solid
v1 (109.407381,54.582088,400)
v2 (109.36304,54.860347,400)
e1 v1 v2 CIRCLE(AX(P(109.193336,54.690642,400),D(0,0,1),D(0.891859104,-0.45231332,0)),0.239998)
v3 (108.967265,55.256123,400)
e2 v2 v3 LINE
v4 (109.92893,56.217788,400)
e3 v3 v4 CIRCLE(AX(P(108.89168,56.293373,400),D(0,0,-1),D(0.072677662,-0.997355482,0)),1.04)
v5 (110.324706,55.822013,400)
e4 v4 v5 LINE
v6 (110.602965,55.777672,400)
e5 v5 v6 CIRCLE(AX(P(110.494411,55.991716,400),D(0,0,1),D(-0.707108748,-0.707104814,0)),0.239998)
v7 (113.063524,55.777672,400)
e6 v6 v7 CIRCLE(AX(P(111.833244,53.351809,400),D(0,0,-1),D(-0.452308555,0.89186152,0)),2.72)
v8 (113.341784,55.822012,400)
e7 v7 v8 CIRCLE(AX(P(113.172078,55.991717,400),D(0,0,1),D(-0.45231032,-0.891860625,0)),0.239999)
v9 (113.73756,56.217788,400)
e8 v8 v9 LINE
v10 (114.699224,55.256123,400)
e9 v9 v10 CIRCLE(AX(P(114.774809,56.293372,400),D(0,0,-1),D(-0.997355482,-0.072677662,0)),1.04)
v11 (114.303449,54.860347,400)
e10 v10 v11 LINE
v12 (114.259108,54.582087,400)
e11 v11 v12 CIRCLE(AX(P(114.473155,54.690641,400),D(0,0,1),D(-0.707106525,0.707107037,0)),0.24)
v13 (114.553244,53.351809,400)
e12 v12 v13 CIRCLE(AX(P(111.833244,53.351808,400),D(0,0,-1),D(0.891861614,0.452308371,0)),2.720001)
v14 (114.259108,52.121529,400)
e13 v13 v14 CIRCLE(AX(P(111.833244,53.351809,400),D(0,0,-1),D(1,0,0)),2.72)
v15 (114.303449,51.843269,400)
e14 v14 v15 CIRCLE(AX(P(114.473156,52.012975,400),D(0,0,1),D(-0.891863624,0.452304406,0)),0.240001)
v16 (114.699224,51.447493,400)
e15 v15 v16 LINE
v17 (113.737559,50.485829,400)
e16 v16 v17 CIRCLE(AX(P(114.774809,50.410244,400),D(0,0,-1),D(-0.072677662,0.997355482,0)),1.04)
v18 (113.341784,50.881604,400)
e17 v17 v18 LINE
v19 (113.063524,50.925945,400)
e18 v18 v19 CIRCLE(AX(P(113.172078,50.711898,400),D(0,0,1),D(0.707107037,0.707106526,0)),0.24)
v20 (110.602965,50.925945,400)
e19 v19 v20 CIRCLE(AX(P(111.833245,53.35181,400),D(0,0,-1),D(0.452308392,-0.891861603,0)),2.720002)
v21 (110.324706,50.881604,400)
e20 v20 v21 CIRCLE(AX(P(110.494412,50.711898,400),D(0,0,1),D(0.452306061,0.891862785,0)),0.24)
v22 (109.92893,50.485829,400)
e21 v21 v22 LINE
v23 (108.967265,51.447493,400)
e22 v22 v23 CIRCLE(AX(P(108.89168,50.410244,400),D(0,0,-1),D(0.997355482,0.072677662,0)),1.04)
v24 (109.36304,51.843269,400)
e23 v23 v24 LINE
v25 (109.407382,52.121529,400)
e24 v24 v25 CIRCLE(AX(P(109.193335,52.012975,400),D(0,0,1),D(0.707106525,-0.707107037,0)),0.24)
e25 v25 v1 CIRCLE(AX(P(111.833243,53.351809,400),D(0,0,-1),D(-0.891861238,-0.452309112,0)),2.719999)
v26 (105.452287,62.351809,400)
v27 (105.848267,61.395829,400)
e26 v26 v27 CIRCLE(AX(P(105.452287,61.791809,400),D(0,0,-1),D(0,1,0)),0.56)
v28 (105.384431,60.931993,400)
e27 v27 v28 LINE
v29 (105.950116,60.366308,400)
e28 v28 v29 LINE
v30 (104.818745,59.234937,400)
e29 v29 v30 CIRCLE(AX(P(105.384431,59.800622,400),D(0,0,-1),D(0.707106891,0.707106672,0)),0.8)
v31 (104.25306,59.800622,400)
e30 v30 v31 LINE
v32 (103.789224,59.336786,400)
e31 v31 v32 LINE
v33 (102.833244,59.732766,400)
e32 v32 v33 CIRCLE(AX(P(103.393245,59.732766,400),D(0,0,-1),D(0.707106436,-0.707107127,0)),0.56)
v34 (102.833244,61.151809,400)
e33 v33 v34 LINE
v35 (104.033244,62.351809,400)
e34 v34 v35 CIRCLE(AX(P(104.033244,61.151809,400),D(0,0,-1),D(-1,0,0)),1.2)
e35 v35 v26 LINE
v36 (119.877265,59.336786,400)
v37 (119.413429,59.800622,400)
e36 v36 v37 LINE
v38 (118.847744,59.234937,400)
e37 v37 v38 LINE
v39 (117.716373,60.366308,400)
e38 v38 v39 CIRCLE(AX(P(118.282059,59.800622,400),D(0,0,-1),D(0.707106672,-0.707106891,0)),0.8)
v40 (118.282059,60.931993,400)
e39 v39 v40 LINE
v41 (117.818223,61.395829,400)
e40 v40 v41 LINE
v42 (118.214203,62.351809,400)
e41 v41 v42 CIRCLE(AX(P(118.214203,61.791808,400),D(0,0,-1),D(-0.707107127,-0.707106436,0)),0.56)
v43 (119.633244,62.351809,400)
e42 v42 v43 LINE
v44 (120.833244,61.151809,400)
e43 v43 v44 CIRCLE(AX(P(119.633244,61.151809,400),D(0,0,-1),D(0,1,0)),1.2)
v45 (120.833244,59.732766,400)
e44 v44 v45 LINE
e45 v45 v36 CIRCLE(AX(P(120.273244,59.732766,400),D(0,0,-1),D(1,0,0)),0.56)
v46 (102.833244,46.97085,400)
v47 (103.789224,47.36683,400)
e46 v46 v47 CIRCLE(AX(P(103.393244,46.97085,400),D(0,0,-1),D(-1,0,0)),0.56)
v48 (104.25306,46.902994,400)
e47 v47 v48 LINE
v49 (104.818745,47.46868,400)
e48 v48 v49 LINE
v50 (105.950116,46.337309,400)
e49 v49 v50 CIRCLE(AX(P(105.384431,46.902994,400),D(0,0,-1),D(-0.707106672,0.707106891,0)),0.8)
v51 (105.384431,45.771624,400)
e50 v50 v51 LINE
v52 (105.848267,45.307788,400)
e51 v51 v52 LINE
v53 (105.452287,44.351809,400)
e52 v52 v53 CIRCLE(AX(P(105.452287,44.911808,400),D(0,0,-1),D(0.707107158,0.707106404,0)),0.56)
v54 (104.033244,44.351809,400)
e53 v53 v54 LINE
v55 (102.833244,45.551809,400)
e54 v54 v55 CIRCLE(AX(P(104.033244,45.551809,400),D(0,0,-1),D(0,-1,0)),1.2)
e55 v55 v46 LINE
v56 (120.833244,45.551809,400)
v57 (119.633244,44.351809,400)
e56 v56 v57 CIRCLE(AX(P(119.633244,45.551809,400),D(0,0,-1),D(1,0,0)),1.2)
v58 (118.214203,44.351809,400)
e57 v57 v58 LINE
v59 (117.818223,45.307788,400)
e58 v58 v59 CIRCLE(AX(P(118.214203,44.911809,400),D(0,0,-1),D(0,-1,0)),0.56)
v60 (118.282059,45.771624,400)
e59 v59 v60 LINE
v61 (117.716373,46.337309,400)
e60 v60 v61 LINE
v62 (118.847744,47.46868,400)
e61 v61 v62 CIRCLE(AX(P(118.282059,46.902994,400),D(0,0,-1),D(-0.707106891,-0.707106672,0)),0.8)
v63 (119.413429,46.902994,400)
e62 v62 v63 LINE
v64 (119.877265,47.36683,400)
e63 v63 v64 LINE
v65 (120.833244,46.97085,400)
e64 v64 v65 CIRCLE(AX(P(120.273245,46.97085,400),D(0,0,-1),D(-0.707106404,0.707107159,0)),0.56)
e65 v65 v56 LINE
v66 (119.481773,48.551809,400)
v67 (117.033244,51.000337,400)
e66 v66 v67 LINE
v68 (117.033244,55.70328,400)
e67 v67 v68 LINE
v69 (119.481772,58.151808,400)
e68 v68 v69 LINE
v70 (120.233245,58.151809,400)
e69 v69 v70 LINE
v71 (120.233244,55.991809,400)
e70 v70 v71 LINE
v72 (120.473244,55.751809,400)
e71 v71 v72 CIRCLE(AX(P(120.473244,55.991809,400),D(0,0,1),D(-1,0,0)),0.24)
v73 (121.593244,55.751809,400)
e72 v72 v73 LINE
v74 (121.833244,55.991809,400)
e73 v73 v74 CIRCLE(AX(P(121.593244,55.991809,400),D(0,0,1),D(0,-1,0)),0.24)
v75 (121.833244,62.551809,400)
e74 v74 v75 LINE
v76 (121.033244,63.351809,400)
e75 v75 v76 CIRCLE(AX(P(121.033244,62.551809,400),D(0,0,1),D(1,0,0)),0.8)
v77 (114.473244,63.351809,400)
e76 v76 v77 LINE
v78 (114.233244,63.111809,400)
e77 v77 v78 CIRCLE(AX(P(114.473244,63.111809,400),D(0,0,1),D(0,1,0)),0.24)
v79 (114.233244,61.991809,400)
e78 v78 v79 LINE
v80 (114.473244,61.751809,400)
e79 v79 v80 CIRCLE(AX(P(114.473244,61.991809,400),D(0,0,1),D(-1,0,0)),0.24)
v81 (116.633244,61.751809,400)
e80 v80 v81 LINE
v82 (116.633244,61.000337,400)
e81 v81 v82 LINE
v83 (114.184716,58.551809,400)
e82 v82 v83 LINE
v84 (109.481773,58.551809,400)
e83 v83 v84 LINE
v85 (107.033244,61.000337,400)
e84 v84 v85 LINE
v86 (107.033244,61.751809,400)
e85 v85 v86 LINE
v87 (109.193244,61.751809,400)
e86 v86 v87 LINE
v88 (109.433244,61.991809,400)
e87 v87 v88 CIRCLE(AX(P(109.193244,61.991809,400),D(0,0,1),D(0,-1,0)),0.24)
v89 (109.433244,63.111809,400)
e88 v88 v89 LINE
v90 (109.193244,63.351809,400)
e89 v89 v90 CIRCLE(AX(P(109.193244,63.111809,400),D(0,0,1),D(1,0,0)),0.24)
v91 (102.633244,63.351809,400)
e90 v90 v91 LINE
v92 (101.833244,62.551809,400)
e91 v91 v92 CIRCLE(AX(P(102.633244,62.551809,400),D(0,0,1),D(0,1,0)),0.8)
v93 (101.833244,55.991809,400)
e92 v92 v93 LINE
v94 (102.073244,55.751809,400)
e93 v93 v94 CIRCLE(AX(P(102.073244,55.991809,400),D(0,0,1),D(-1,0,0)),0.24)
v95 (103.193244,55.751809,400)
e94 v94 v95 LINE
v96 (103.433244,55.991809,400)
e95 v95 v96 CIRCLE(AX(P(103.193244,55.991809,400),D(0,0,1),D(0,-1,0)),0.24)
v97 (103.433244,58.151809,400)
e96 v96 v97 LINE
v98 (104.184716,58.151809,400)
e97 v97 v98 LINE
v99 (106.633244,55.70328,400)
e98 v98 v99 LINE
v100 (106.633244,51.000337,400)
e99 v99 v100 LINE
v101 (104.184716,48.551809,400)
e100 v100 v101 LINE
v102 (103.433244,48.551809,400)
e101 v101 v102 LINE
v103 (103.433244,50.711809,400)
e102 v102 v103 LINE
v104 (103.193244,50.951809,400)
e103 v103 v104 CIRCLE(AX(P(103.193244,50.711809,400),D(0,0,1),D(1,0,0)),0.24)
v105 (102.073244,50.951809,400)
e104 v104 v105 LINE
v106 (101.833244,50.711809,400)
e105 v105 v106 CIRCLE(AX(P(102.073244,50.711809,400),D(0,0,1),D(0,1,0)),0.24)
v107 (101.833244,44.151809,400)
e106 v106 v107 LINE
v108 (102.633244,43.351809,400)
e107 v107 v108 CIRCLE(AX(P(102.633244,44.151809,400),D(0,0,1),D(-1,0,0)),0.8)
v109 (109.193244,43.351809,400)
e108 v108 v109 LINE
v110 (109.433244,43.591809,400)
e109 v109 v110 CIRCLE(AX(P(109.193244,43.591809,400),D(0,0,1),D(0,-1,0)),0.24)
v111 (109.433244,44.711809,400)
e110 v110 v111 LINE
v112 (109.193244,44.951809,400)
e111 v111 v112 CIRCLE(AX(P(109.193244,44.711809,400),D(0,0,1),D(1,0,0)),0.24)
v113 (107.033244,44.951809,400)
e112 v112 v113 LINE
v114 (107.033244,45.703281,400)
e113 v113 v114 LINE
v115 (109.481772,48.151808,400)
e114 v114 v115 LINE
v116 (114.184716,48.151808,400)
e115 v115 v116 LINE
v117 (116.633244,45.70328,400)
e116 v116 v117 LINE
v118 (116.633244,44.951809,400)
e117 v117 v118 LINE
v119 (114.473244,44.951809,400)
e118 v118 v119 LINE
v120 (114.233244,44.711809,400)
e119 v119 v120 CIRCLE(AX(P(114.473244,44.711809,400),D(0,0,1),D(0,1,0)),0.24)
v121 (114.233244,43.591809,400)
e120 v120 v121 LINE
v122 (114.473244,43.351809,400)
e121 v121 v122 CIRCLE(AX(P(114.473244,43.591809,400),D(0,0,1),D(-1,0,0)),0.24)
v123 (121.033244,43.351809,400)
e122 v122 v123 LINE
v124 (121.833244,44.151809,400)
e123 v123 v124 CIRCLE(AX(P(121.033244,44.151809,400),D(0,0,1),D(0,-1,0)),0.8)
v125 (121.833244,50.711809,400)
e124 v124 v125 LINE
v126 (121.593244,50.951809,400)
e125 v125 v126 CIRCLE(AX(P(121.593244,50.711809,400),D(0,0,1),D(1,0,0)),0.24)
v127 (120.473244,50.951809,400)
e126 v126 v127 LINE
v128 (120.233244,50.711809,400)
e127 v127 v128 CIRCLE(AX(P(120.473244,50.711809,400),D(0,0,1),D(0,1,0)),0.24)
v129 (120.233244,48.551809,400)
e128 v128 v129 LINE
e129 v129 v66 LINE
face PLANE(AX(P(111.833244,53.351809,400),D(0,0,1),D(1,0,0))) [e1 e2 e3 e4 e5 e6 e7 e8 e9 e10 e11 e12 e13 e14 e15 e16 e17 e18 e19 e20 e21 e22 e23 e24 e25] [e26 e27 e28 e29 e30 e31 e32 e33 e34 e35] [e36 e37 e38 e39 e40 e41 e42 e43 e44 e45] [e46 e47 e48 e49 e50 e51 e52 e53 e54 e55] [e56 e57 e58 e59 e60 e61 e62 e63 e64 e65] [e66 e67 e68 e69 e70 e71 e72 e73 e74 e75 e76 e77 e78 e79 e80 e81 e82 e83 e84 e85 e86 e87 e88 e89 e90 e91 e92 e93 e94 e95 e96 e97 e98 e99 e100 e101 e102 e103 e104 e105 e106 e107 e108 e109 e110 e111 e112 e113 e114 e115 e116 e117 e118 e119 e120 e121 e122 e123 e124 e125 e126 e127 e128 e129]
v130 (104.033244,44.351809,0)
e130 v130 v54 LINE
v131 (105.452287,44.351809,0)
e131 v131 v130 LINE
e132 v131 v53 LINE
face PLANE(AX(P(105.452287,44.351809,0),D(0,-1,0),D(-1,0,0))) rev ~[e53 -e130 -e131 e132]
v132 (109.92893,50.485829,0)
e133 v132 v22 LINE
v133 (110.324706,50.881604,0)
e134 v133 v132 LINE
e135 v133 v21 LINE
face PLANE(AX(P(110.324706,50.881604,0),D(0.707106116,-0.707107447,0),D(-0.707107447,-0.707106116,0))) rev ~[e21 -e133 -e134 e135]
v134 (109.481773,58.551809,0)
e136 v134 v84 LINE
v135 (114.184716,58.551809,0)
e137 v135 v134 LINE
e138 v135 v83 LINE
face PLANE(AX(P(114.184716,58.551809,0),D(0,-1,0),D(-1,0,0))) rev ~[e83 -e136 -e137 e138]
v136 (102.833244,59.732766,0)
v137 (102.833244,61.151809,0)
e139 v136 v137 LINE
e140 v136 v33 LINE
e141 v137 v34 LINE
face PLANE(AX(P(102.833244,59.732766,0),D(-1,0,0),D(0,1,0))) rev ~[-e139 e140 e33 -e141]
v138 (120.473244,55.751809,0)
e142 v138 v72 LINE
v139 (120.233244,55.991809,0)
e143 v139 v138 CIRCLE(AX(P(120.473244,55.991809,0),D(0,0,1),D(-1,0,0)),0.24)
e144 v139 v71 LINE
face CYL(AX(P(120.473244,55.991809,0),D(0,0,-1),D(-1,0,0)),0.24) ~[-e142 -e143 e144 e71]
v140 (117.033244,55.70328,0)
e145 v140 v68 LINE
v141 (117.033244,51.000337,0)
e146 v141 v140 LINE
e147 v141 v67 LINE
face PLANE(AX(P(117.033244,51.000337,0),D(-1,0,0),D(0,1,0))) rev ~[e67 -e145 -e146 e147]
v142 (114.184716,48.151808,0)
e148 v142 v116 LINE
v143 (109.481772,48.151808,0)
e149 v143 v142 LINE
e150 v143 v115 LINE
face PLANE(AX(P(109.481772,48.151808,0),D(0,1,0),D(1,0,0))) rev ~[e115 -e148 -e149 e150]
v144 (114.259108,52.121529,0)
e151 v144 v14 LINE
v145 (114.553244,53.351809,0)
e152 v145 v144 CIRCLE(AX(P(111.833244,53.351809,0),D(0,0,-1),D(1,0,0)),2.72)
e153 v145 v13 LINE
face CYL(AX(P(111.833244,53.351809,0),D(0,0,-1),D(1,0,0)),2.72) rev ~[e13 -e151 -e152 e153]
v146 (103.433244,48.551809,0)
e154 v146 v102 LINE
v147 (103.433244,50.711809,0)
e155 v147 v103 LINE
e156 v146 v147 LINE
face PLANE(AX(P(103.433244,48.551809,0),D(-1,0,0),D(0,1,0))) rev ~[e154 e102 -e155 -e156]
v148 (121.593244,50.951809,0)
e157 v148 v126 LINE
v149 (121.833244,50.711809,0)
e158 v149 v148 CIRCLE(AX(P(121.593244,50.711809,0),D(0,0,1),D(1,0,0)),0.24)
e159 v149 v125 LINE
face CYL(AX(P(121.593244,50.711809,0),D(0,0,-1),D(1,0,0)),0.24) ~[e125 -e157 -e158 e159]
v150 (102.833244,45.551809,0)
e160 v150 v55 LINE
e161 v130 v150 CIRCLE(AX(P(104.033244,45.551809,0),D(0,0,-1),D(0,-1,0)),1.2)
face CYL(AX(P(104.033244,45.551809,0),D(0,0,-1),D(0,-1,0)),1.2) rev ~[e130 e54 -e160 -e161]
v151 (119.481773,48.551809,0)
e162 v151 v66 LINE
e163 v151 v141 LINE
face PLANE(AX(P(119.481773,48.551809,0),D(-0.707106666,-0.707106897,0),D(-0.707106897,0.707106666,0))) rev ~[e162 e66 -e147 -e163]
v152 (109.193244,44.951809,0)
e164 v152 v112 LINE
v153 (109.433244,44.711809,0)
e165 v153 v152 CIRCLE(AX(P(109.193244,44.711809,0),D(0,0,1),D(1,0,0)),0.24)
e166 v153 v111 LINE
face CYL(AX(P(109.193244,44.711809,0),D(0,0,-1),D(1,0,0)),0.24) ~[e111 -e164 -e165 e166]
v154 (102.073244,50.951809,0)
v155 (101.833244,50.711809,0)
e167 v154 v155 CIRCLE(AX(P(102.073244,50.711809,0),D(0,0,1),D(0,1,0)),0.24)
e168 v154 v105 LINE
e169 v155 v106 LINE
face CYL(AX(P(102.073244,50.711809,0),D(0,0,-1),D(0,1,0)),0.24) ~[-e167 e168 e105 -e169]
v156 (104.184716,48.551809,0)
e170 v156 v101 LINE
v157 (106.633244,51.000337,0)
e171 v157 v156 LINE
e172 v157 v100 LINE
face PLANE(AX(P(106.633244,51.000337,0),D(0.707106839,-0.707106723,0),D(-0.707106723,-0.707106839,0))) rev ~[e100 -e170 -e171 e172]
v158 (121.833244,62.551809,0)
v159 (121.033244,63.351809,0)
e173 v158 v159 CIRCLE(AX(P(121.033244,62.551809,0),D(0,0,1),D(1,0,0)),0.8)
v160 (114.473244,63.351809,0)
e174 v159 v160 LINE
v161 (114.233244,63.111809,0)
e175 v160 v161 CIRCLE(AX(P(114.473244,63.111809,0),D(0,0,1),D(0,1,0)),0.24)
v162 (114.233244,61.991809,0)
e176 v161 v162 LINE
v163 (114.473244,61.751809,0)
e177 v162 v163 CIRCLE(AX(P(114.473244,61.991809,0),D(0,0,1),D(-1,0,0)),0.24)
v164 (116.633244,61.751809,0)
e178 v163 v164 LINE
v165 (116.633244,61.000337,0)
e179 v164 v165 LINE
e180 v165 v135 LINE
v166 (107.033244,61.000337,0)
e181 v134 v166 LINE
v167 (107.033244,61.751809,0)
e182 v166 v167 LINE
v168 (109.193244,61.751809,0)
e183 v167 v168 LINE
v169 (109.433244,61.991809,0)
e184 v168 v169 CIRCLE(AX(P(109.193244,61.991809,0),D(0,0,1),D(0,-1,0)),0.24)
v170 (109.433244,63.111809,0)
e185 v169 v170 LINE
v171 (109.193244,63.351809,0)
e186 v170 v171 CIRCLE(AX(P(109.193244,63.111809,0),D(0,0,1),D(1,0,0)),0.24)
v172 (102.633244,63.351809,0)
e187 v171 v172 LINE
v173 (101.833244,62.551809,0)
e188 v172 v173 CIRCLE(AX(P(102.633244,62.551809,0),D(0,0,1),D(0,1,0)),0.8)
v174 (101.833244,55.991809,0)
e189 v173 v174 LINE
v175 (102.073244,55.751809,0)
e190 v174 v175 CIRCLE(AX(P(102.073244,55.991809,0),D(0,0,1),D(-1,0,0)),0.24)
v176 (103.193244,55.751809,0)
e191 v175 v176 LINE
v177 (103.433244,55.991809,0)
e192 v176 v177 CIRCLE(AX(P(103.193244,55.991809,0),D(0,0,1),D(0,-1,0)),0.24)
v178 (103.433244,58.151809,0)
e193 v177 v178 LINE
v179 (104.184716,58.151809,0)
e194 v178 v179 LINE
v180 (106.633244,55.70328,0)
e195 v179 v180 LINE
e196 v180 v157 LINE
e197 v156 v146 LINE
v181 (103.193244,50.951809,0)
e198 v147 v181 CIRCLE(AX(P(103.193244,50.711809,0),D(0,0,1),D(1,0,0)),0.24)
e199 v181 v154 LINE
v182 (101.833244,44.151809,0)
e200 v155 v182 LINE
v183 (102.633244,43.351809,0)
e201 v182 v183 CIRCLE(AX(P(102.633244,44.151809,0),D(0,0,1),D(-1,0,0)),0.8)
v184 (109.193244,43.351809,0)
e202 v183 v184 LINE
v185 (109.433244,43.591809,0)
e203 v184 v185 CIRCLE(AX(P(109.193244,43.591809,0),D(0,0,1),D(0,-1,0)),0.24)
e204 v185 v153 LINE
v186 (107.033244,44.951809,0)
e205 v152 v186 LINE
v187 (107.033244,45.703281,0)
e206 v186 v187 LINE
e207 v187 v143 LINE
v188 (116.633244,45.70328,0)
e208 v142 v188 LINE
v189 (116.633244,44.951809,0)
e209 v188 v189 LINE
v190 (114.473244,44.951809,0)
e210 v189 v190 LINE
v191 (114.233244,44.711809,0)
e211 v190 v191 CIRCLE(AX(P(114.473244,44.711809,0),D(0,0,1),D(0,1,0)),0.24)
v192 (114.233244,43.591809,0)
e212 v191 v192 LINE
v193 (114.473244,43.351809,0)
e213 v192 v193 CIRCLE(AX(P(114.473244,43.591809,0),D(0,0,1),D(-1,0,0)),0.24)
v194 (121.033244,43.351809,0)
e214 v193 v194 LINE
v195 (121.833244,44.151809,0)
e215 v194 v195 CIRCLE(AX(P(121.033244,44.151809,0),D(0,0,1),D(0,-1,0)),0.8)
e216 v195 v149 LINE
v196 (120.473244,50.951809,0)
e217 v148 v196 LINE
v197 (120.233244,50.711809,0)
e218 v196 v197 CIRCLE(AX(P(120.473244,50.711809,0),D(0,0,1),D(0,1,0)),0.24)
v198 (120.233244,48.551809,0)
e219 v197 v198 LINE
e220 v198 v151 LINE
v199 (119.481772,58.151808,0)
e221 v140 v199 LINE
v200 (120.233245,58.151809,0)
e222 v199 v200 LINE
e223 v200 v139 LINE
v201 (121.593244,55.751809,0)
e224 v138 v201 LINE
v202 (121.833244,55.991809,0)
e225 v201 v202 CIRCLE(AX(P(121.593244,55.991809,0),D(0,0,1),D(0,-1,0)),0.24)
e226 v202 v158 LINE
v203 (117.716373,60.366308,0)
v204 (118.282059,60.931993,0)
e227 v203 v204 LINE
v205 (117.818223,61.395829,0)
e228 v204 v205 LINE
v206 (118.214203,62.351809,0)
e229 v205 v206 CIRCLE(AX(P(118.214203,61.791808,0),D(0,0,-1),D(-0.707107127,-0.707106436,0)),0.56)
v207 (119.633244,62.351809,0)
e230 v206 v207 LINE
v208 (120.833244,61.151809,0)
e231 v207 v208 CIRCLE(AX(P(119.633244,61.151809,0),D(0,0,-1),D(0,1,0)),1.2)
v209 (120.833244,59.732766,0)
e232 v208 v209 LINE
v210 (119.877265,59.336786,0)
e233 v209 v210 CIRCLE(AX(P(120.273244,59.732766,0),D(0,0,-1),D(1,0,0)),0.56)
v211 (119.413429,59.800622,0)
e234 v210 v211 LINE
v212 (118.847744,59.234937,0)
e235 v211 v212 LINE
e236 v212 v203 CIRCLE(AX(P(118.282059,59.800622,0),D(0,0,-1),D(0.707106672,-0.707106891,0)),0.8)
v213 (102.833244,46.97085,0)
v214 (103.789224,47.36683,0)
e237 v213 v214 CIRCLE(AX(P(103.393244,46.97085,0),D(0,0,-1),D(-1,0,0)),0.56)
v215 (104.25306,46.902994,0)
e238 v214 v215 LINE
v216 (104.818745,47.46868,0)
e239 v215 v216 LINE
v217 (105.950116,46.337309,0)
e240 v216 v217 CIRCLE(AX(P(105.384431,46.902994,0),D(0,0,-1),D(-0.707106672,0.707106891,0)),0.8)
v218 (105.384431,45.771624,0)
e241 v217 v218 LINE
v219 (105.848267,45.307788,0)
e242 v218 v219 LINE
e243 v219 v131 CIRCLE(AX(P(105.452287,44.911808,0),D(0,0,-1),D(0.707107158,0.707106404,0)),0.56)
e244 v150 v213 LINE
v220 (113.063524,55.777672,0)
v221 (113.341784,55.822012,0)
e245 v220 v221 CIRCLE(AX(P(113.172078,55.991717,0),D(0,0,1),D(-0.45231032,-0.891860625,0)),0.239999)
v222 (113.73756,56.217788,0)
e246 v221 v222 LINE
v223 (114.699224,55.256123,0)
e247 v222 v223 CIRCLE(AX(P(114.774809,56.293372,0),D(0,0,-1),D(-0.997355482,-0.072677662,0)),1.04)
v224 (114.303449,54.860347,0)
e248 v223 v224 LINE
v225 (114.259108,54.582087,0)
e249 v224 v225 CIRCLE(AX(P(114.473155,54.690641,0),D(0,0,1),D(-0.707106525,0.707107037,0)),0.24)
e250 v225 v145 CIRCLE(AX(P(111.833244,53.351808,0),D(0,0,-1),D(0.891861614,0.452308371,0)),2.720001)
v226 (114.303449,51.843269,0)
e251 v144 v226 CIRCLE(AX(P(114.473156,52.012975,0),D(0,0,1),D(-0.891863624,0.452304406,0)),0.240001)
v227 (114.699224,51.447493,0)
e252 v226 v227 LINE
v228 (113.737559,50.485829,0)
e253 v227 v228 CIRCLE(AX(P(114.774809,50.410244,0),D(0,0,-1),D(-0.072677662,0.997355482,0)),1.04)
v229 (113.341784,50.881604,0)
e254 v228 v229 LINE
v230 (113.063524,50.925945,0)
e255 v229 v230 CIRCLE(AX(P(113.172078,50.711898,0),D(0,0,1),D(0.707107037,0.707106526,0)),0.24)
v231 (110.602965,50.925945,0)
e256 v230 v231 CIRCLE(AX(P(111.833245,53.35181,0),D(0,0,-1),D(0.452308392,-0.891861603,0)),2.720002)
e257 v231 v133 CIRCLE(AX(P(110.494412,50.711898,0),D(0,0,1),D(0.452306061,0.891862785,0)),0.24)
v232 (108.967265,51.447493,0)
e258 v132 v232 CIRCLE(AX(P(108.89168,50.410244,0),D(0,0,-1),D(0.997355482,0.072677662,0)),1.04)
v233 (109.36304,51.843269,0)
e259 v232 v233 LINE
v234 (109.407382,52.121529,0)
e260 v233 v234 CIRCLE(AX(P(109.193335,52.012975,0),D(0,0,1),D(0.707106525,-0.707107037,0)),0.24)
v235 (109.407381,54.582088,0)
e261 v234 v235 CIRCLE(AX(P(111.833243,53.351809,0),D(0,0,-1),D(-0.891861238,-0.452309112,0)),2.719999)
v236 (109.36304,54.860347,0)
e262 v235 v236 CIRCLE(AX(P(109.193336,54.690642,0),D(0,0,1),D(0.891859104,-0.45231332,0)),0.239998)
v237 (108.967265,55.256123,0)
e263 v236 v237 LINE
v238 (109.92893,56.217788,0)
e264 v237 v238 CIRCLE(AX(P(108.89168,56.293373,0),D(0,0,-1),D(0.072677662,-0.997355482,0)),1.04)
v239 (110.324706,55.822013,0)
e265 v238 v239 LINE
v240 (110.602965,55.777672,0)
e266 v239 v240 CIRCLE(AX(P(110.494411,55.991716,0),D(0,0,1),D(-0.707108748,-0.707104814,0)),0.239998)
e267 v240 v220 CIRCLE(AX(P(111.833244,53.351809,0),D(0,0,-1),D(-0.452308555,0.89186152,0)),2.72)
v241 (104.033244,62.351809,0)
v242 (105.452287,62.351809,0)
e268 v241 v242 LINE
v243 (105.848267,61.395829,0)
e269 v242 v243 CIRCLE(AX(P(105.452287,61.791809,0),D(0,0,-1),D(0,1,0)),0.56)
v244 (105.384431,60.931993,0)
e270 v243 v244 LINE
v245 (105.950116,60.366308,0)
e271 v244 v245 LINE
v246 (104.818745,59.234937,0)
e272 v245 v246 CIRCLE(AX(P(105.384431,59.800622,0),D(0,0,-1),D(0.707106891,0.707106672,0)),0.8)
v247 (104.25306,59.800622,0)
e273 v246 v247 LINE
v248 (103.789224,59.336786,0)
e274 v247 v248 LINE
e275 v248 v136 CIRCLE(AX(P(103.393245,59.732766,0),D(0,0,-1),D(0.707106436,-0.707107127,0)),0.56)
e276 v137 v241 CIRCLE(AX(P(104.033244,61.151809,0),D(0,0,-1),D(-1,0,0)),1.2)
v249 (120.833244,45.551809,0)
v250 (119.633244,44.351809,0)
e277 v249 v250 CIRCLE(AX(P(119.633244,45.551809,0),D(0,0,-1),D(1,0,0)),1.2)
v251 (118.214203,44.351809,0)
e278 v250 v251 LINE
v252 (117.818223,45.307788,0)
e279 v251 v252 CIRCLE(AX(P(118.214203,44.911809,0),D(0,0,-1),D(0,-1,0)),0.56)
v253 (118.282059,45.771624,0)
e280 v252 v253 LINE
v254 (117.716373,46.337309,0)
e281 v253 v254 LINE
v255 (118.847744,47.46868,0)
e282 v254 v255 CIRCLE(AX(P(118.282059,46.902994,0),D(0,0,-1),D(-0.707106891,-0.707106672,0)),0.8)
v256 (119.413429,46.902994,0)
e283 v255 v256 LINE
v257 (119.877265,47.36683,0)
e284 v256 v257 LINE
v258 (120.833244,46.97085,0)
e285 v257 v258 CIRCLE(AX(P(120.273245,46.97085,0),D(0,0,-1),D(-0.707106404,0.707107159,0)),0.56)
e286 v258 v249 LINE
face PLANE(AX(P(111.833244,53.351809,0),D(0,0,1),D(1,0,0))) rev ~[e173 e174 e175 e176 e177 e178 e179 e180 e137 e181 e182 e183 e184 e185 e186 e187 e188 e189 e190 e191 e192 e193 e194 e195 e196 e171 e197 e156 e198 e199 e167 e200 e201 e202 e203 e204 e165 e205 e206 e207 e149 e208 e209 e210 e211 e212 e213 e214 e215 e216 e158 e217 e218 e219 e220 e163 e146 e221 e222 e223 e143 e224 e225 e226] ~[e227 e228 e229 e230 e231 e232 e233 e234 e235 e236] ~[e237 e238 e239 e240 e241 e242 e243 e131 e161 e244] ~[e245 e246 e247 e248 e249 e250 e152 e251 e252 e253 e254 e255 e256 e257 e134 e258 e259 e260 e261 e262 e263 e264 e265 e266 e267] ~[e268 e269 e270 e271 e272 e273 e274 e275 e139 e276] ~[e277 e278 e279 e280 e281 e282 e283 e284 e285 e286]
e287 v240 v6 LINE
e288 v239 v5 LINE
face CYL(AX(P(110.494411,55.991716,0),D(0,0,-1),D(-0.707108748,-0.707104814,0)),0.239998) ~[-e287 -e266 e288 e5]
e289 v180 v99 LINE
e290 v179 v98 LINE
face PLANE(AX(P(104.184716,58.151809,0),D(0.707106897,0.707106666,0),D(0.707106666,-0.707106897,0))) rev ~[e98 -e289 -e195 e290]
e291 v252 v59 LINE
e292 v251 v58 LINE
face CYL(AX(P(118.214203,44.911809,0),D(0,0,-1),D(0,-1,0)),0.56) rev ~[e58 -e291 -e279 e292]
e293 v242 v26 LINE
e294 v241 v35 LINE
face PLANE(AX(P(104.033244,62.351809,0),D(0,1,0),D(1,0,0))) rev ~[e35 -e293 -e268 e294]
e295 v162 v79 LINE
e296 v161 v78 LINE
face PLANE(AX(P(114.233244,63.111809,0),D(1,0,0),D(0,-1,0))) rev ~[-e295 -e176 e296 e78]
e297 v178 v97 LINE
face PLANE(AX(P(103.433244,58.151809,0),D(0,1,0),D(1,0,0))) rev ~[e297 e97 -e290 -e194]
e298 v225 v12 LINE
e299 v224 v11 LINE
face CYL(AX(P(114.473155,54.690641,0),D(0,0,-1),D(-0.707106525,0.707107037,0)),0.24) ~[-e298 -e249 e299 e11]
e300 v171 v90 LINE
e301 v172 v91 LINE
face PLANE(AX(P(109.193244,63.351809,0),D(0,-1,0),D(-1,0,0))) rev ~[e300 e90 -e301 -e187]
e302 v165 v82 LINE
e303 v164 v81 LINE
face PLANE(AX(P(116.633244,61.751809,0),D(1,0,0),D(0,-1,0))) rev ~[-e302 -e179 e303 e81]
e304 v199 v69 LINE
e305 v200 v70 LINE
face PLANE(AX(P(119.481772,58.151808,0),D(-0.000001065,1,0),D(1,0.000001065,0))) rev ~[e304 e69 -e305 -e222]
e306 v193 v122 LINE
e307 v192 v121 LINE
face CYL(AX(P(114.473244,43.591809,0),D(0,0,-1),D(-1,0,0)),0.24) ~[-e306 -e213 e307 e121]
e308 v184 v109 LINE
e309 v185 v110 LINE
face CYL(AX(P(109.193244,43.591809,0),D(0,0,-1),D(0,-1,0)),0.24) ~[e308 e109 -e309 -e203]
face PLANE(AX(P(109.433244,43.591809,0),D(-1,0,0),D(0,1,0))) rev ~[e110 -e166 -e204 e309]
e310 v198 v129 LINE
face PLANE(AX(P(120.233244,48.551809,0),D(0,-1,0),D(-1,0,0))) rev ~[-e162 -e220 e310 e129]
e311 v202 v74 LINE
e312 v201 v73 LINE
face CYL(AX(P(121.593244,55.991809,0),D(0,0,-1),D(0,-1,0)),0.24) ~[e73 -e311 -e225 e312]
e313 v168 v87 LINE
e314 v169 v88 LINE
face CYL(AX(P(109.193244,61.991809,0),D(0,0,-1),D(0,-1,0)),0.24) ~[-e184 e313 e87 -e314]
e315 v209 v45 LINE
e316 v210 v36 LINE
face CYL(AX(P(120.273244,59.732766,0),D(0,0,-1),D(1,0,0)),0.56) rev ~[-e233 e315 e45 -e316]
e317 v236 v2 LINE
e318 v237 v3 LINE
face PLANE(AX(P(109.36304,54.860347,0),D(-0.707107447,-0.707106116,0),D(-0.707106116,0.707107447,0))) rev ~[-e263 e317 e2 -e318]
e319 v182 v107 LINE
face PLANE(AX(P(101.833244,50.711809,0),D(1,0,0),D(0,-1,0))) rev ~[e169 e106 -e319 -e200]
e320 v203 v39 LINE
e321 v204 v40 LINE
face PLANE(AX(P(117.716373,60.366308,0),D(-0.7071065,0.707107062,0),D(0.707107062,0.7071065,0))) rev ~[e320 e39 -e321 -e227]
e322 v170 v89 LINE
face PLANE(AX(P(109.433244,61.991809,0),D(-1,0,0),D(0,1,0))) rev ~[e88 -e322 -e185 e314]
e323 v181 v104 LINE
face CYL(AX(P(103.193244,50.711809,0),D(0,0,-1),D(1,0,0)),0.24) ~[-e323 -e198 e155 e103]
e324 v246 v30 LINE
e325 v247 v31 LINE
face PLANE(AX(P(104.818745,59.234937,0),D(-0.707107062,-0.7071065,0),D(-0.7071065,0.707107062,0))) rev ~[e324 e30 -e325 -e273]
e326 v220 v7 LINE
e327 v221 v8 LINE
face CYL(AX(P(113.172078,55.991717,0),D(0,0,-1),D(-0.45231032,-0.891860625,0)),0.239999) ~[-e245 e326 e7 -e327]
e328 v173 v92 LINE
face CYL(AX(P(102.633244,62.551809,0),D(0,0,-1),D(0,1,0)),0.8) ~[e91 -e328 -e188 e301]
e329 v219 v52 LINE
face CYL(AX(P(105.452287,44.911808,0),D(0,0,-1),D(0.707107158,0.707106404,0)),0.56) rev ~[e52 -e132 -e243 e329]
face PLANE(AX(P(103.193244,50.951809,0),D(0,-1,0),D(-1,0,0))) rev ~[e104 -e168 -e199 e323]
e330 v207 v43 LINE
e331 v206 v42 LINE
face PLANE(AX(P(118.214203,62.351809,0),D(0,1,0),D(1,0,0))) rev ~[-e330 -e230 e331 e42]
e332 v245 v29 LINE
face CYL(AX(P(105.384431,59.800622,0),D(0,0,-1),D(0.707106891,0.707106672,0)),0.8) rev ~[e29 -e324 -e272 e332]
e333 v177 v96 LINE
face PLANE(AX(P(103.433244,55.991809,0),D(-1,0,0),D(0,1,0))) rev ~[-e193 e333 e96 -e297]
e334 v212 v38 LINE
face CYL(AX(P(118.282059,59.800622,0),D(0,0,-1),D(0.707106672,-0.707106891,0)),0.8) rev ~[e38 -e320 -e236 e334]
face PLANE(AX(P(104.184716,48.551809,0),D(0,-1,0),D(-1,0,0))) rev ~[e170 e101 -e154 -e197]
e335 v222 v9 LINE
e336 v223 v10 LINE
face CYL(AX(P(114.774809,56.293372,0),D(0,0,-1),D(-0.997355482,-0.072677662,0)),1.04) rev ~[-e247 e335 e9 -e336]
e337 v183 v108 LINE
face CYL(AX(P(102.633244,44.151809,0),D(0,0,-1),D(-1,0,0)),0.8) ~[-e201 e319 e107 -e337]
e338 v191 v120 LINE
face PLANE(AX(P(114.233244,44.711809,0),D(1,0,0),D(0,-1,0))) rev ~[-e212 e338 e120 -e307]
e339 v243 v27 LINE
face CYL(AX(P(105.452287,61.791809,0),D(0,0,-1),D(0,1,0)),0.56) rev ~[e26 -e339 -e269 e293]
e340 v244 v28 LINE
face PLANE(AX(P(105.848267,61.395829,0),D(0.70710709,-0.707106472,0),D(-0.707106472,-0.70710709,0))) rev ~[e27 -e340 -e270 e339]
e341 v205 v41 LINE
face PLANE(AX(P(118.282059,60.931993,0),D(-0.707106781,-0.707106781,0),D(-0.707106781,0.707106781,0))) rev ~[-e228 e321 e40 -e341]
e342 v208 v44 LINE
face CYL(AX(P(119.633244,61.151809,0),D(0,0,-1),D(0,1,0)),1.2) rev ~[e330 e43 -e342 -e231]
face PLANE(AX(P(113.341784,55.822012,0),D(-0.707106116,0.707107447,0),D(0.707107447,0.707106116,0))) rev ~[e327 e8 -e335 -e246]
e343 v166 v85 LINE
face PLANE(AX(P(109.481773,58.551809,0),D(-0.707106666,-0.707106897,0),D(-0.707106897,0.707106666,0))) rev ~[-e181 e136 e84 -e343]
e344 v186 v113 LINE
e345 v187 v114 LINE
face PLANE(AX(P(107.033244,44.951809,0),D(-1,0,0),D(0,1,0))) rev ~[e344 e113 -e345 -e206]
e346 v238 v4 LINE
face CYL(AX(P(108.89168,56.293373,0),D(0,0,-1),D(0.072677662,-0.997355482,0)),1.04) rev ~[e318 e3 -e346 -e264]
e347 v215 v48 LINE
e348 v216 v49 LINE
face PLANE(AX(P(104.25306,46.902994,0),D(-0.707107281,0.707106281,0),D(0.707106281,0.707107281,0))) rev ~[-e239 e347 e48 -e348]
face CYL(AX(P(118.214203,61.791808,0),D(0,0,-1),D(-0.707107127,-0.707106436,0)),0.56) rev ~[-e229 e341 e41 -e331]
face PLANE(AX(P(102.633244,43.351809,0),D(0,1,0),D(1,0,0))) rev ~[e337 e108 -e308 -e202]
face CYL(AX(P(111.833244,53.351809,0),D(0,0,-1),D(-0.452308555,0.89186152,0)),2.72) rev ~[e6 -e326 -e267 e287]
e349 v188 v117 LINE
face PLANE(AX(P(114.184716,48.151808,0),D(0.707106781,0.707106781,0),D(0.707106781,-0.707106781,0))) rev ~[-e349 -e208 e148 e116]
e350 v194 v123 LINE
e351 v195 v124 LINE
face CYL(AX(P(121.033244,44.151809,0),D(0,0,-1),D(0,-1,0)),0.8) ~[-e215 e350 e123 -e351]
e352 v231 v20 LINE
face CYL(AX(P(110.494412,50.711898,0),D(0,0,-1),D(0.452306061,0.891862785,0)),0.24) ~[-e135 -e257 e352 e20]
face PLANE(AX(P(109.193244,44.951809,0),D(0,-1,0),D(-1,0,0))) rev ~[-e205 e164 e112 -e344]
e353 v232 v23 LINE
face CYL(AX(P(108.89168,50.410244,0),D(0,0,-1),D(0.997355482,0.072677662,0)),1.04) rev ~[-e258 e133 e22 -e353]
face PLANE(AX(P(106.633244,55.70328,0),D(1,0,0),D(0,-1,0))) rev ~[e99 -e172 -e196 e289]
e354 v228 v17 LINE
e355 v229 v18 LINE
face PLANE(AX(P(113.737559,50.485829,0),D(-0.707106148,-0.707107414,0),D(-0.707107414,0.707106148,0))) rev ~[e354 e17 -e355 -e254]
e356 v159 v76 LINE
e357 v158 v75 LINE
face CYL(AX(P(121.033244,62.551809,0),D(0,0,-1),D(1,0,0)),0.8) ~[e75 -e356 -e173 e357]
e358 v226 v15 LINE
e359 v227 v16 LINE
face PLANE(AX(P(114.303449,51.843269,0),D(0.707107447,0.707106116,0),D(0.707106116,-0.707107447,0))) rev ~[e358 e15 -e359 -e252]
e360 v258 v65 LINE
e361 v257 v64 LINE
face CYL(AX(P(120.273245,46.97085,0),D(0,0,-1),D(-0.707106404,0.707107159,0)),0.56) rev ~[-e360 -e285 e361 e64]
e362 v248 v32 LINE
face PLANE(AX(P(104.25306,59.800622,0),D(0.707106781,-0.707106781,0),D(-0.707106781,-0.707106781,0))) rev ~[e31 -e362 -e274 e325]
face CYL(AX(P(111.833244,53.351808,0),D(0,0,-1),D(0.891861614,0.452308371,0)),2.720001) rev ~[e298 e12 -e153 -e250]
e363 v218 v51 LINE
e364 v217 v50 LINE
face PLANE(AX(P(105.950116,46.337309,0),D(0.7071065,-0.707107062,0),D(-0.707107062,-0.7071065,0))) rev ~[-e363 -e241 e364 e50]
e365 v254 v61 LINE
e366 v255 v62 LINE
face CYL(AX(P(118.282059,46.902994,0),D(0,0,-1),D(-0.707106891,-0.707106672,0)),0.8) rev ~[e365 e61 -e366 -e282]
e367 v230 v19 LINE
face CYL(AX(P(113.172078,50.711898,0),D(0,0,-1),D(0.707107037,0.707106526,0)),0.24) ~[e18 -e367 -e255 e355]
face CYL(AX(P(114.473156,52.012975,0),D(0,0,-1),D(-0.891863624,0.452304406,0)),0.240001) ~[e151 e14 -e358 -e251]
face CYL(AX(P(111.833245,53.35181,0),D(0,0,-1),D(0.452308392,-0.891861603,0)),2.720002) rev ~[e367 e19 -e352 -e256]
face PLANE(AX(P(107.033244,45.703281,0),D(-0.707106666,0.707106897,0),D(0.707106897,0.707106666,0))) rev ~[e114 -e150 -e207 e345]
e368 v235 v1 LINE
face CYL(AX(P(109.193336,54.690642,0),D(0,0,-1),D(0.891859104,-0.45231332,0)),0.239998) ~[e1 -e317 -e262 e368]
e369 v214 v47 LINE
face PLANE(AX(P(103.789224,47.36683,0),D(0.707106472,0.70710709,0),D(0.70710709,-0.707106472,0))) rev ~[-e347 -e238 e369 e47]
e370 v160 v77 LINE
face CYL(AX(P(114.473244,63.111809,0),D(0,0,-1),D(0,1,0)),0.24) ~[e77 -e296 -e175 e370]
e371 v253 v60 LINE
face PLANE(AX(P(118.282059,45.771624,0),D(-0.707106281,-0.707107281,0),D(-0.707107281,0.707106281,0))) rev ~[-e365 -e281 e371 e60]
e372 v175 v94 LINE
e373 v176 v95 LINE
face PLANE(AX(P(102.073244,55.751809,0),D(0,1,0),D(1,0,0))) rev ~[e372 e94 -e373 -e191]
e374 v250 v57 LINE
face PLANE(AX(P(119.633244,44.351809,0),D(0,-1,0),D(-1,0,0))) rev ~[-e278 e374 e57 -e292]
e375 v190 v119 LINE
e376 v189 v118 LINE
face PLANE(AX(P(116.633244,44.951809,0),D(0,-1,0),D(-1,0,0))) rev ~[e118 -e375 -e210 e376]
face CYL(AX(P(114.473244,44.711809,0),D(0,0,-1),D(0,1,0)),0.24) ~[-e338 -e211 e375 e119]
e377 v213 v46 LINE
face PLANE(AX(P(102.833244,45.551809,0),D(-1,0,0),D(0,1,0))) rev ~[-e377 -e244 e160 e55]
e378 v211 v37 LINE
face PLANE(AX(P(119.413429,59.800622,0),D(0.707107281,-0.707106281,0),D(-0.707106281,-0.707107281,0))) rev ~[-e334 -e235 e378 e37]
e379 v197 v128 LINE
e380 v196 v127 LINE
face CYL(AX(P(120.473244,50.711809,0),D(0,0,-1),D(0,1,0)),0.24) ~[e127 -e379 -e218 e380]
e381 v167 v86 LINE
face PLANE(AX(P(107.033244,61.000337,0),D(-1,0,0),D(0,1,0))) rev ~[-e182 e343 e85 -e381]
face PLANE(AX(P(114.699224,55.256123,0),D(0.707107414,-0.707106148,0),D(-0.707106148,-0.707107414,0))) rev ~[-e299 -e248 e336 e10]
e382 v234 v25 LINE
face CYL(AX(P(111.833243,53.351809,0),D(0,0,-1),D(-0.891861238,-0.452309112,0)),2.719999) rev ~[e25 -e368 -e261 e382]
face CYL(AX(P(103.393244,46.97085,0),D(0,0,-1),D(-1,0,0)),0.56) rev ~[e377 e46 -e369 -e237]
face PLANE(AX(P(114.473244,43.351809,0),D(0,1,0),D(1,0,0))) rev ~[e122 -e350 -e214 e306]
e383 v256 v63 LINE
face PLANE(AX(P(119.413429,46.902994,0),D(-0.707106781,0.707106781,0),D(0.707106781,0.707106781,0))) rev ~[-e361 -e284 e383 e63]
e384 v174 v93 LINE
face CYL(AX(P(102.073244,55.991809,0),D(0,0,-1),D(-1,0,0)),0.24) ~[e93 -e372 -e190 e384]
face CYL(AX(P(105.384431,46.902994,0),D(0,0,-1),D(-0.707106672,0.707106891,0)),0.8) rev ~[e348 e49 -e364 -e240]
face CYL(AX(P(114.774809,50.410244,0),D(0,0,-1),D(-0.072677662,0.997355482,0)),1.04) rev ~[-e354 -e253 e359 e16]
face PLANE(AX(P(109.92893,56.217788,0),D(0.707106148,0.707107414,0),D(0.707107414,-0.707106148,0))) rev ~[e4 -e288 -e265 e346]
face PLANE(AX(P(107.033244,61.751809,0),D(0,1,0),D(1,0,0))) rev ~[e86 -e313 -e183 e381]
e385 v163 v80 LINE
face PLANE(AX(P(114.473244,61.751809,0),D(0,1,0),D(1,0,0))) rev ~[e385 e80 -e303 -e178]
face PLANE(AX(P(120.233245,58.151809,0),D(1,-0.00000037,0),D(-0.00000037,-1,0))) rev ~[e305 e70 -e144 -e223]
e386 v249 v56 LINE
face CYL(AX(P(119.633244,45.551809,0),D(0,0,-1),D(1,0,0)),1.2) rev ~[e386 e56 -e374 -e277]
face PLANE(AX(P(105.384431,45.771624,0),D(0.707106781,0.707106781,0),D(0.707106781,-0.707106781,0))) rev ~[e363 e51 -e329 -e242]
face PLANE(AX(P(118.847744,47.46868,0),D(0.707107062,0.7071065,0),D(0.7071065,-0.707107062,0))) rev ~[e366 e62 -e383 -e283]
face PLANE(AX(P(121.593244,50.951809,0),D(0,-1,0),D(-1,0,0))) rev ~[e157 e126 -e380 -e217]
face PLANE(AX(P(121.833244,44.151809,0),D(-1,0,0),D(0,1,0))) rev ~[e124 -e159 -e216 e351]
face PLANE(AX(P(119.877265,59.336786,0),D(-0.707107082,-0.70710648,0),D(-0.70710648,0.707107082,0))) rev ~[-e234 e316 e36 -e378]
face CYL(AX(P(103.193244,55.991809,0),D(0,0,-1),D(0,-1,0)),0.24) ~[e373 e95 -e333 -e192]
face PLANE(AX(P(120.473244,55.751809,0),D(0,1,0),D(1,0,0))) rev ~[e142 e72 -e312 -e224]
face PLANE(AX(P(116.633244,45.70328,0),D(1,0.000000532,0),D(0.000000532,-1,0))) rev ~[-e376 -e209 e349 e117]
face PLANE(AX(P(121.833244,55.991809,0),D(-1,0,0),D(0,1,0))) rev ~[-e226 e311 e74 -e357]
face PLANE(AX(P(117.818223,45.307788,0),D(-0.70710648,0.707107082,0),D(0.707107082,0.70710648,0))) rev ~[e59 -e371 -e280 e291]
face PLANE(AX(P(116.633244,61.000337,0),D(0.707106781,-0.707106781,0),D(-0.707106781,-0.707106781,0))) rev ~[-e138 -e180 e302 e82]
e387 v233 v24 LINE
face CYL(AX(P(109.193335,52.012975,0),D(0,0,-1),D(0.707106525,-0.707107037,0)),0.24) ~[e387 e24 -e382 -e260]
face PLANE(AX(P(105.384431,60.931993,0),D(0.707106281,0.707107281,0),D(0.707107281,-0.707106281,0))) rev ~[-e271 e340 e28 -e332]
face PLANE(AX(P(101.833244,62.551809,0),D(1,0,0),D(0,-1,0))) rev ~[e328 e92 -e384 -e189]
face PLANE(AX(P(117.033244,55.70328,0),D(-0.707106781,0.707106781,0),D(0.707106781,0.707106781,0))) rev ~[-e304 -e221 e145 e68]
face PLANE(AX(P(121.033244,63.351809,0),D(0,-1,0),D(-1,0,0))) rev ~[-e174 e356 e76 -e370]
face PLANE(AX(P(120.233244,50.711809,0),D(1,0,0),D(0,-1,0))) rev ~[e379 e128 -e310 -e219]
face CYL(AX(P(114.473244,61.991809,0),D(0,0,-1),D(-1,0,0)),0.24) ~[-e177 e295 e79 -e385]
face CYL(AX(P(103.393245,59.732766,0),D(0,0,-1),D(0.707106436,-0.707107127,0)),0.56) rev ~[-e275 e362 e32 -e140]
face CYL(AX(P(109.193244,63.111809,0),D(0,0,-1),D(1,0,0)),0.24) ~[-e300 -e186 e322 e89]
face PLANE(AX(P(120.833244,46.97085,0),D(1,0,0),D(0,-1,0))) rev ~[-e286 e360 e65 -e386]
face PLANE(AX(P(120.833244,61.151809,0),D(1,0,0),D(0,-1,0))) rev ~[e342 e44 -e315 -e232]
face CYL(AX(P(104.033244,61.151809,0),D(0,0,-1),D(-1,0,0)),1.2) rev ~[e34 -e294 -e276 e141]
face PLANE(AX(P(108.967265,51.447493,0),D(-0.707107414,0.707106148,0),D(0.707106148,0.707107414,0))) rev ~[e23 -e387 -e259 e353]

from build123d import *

# Parameters (mm, degrees)
F1_DEPTH = 400


# Not quite as in the source:
# - ends of sketch curves that miss each other by under 0.0002 mm in the source are joined


with BuildPart() as f1:
    # F0 (on Top) → F1 (new body)
    with BuildSketch(Plane.XY):
        with BuildLine():
            ThreePointArc((121.8332443976, 62.5518085142), (121.5989298226, 63.1174939391), (121.0332443976, 63.3518085142))
            Line((121.0332443976, 63.3518085142), (114.4732443976, 63.3518085142))
            ThreePointArc((114.4732443976, 63.3518085142), (114.3035387701, 63.2815141417), (114.2332443976, 63.1118085142))
            Line((114.2332443976, 63.1118085142), (114.2332443976, 61.9918085142))
            ThreePointArc((114.2332443976, 61.9918085142), (114.3035387701, 61.8221028867), (114.4732443976, 61.7518085142))
            Line((114.4732443976, 61.7518085142), (116.6332443976, 61.7518085142))
            Line((116.6332443976, 61.7518085142), (116.6332443976, 61.0003365142))
            Line((116.6332443976, 61.0003365142), (114.1847163976, 58.5518085142))
            Line((114.1847163976, 58.5518085142), (109.4817731976, 58.5518085142))
            Line((109.4817731976, 58.5518085142), (107.0332443976, 61.0003365142))
            Line((107.0332443976, 61.0003365142), (107.0332443976, 61.7518085142))
            Line((107.0332443976, 61.7518085142), (109.1932443976, 61.7518085142))
            ThreePointArc((109.1932443976, 61.7518085142), (109.3629500251, 61.8221028867), (109.4332443976, 61.9918085142))
            Line((109.4332443976, 61.9918085142), (109.4332443976, 63.1118085142))
            ThreePointArc((109.4332443976, 63.1118085142), (109.3629500251, 63.2815141417), (109.1932443976, 63.3518085142))
            Line((109.1932443976, 63.3518085142), (102.6332443976, 63.3518085142))
            ThreePointArc((102.6332443976, 63.3518085142), (102.0675589727, 63.1174939391), (101.8332443976, 62.5518085142))
            Line((101.8332443976, 62.5518085142), (101.8332443976, 55.9918085142))
            ThreePointArc((101.8332443976, 55.9918085142), (101.9035387701, 55.8221028867), (102.0732443976, 55.7518085142))
            Line((102.0732443976, 55.7518085142), (103.1932443976, 55.7518085142))
            ThreePointArc((103.1932443976, 55.7518085142), (103.3629500251, 55.8221028867), (103.4332443976, 55.9918085142))
            Line((103.4332443976, 55.9918085142), (103.4332443976, 58.1518085142))
            Line((103.4332443976, 58.1518085142), (104.1847163976, 58.1518085142))
            Line((104.1847163976, 58.1518085142), (106.6332439976, 55.7032801142))
            Line((106.6332439976, 55.7032801142), (106.6332439976, 51.0003365142))
            Line((106.6332439976, 51.0003365142), (104.1847163976, 48.5518085142))
            Line((104.1847163976, 48.5518085142), (103.4332443976, 48.5518085142))
            Line((103.4332443976, 48.5518085142), (103.4332443976, 50.7118085142))
            ThreePointArc((103.4332443976, 50.7118085142), (103.3629500251, 50.8815141417), (103.1932443976, 50.9518085142))
            Line((103.1932443976, 50.9518085142), (102.0732443976, 50.9518085142))
            ThreePointArc((102.0732443976, 50.9518085142), (101.9035387701, 50.8815141417), (101.8332443976, 50.7118085142))
            Line((101.8332443976, 50.7118085142), (101.8332443976, 44.1518085142))
            ThreePointArc((101.8332443976, 44.1518085142), (102.0675589727, 43.5861230892), (102.6332443976, 43.3518085142))
            Line((102.6332443976, 43.3518085142), (109.1932443976, 43.3518085142))
            ThreePointArc((109.1932443976, 43.3518085142), (109.3629500251, 43.4221028867), (109.4332443976, 43.5918085142))
            Line((109.4332443976, 43.5918085142), (109.4332443976, 44.7118085142))
            ThreePointArc((109.4332443976, 44.7118085142), (109.3629500251, 44.8815141417), (109.1932443976, 44.9518085142))
            Line((109.1932443976, 44.9518085142), (107.0332443976, 44.9518085142))
            Line((107.0332443976, 44.9518085142), (107.0332443976, 45.7032805142))
            Line((107.0332443976, 45.7032805142), (109.4817723976, 48.1518077142))
            Line((109.4817723976, 48.1518077142), (114.1847163976, 48.1518077142))
            Line((114.1847163976, 48.1518077142), (116.6332439976, 45.7032801142))
            Line((116.6332439976, 45.7032801142), (116.6332443976, 44.9518085142))
            Line((116.6332443976, 44.9518085142), (114.4732443976, 44.9518085142))
            ThreePointArc((114.4732443976, 44.9518085142), (114.3035387701, 44.8815141417), (114.2332443976, 44.7118085142))
            Line((114.2332443976, 44.7118085142), (114.2332443976, 43.5918085142))
            ThreePointArc((114.2332443976, 43.5918085142), (114.3035387701, 43.4221028867), (114.4732443976, 43.3518085142))
            Line((114.4732443976, 43.3518085142), (121.0332443976, 43.3518085142))
            ThreePointArc((121.0332443976, 43.3518085142), (121.5989298226, 43.5861230892), (121.8332443976, 44.1518085142))
            Line((121.8332443976, 44.1518085142), (121.8332443976, 50.7118085142))
            ThreePointArc((121.8332443976, 50.7118085142), (121.7629500251, 50.8815141417), (121.5932443976, 50.9518085142))
            Line((121.5932443976, 50.9518085142), (120.4732443976, 50.9518085142))
            ThreePointArc((120.4732443976, 50.9518085142), (120.3035387701, 50.8815141417), (120.2332443976, 50.7118085142))
            Line((120.2332443976, 50.7118085142), (120.2332443976, 48.5518085142))
            Line((120.2332443976, 48.5518085142), (119.4817731976, 48.5518085142))
            Line((119.4817731976, 48.5518085142), (117.0332443976, 51.0003365142))
            Line((117.0332443976, 51.0003365142), (117.0332443976, 55.7032797142))
            Line((117.0332443976, 55.7032797142), (119.4817723976, 58.1518077142))
            Line((119.4817723976, 58.1518077142), (120.2332451976, 58.1518085142))
            Line((120.2332451976, 58.1518085142), (120.2332443976, 55.9918085142))
            ThreePointArc((120.2332443976, 55.9918085142), (120.3035387701, 55.8221028867), (120.4732443976, 55.7518085142))
            Line((120.4732443976, 55.7518085142), (121.5932443976, 55.7518085142))
            ThreePointArc((121.5932443976, 55.7518085142), (121.7629500251, 55.8221028867), (121.8332443976, 55.9918085142))
            Line((121.8332443976, 55.9918085142), (121.8332443976, 62.5518085142))
        make_face()
        with BuildLine():
            Line((105.3844307976, 45.7716237142), (105.8482667976, 45.3077877142))
            ThreePointArc((105.8482667976, 45.3077877142), (105.9696592276, 44.6975055307), (105.4522867976, 44.3518085142))
            Line((105.4522867976, 44.3518085142), (104.0332443976, 44.3518085142))
            ThreePointArc((104.0332443976, 44.3518085142), (103.1847162602, 44.7032803768), (102.8332443976, 45.5518085142))
            Line((102.8332443976, 45.5518085142), (102.8332443976, 46.9708501142))
            ThreePointArc((102.8332443976, 46.9708501142), (103.1789416755, 47.4882226524), (103.7892241951, 47.3668299116))
            Line((103.7892241951, 47.3668299116), (104.2530603976, 46.9029941142))
            Line((104.2530603976, 46.9029941142), (104.8187451976, 47.4686797142))
            ThreePointArc((104.8187451976, 47.4686797142), (105.9501162226, 47.4686795391), (105.9501162226, 46.3373086892))
            Line((105.9501162226, 46.3373086892), (105.3844307976, 45.7716237142))
        make_face(mode=Mode.SUBTRACT)
        with BuildLine():
            ThreePointArc((118.2142027976, 44.3518085142), (117.6968303676, 44.6975055307), (117.8182226001, 45.3077879116))
            Line((117.8182226001, 45.3077879116), (118.2820587976, 45.7716237142))
            Line((118.2820587976, 45.7716237142), (117.7163731976, 46.3373085142))
            ThreePointArc((117.7163731976, 46.3373085142), (117.7163733727, 47.4686795391), (118.8477442226, 47.4686795391))
            Line((118.8477442226, 47.4686795391), (119.4134291976, 46.9029941142))
            Line((119.4134291976, 46.9029941142), (119.8772651976, 47.3668301142))
            ThreePointArc((119.8772651976, 47.3668301142), (120.487547381, 47.4882225442), (120.8332443976, 46.9708501142))
            Line((120.8332443976, 46.9708501142), (120.8332443976, 45.5518085142))
            ThreePointArc((120.8332443976, 45.5518085142), (120.481772535, 44.7032803768), (119.6332443976, 44.3518085142))
            Line((119.6332443976, 44.3518085142), (118.2142027976, 44.3518085142))
        make_face(mode=Mode.SUBTRACT)
        with BuildLine():
            ThreePointArc((110.602965129, 55.7776718494), (111.8332447543, 56.0718085142), (113.0635243025, 55.7776715267))
            ThreePointArc((113.0635243025, 55.7776715267), (113.2098459972, 55.7547084557), (113.3417836251, 55.8220124867))
            Line((113.3417836251, 55.8220124867), (113.7375595976, 56.2177877142))
            ThreePointArc((113.7375595976, 56.2177877142), (115.51020025, 57.0287635666), (114.6992243904, 55.2561228157))
            Line((114.6992243904, 55.2561228157), (114.3034491976, 54.8603469142))
            ThreePointArc((114.3034491976, 54.8603469142), (114.2361451391, 54.7284093138), (114.2591079246, 54.5820874743))
            ThreePointArc((114.2591079246, 54.5820874743), (114.4786884735, 53.9842843173), (114.5532443976, 53.3518085142))
            ThreePointArc((114.5532443976, 53.3518085142), (114.4786883905, 52.7193323641), (114.2591075738, 52.121528932))
            ThreePointArc((114.2591075738, 52.121528932), (114.2361451391, 51.9752069146), (114.3034491701, 51.8432692867))
            Line((114.3034491701, 51.8432692867), (114.6992243976, 51.4474933142))
            ThreePointArc((114.6992243976, 51.4474933142), (115.51020025, 49.6748526618), (113.7375594992, 50.4858285214))
            Line((113.7375594992, 50.4858285214), (113.3417835976, 50.8816037142))
            ThreePointArc((113.3417835976, 50.8816037142), (113.2098461759, 50.9489077442), (113.0635244804, 50.9259451509))
            ThreePointArc((113.0635244804, 50.9259451509), (111.8332447543, 50.6318085142), (110.602965129, 50.9259451789))
            ThreePointArc((110.602965129, 50.9259451789), (110.4566434193, 50.9489077442), (110.3247059701, 50.8816037417))
            Line((110.3247059701, 50.8816037417), (109.9289299976, 50.4858285142))
            ThreePointArc((109.9289299976, 50.4858285142), (108.1562893452, 49.6748526618), (108.9672652048, 51.4474934126))
            Line((108.9672652048, 51.4474934126), (109.3630403976, 51.8432693142))
            ThreePointArc((109.3630403976, 51.8432693142), (109.4303444561, 51.9752069146), (109.4073816706, 52.1215287541))
            ThreePointArc((109.4073816706, 52.1215287541), (109.1132443976, 53.3518081574), (109.4073810624, 54.5820877828))
            ThreePointArc((109.4073810624, 54.5820877828), (109.4303444561, 54.7284093138), (109.3630404251, 54.8603469417))
            Line((109.3630404251, 54.8603469417), (108.9672651976, 55.2561229142))
            ThreePointArc((108.9672651976, 55.2561229142), (108.1562893452, 57.0287635666), (109.928930096, 56.217787707))
            Line((109.928930096, 56.217787707), (110.3247059976, 55.8220125142))
            ThreePointArc((110.3247059976, 55.8220125142), (110.456643598, 55.7547084557), (110.602965129, 55.7776718494))
        make_face(mode=Mode.SUBTRACT)
        with BuildLine():
            ThreePointArc((105.4522867976, 62.3518085142), (105.9696593358, 62.0061112363), (105.8482665951, 61.3958287167))
            Line((105.8482665951, 61.3958287167), (105.3844307976, 60.9319925142))
            Line((105.3844307976, 60.9319925142), (105.9501163976, 60.3663077142))
            ThreePointArc((105.9501163976, 60.3663077142), (105.9501162226, 59.2349366892), (104.8187453727, 59.2349366892))
            Line((104.8187453727, 59.2349366892), (104.2530603976, 59.8006221142))
            Line((104.2530603976, 59.8006221142), (103.7892243976, 59.3367861142))
            ThreePointArc((103.7892243976, 59.3367861142), (103.1789416755, 59.215393576), (102.8332443976, 59.7327661142))
            Line((102.8332443976, 59.7327661142), (102.8332443976, 61.1518085142))
            ThreePointArc((102.8332443976, 61.1518085142), (103.1847162602, 62.0003366516), (104.0332443976, 62.3518085142))
            Line((104.0332443976, 62.3518085142), (105.4522867976, 62.3518085142))
        make_face(mode=Mode.SUBTRACT)
        with BuildLine():
            Line((118.2820587976, 60.9319925142), (117.8182227976, 61.3958285142))
            ThreePointArc((117.8182227976, 61.3958285142), (117.6968302594, 62.0061112363), (118.2142027976, 62.3518085142))
            Line((118.2142027976, 62.3518085142), (119.6332443976, 62.3518085142))
            ThreePointArc((119.6332443976, 62.3518085142), (120.481772535, 62.0003366516), (120.8332443976, 61.1518085142))
            Line((120.8332443976, 61.1518085142), (120.8332443976, 59.7327661142))
            ThreePointArc((120.8332443976, 59.7327661142), (120.487547381, 59.2153936842), (119.8772650001, 59.3367859167))
            Line((119.8772650001, 59.3367859167), (119.4134291976, 59.8006221142))
            Line((119.4134291976, 59.8006221142), (118.8477443976, 59.2349365142))
            ThreePointArc((118.8477443976, 59.2349365142), (117.7163733727, 59.2349366892), (117.7163733727, 60.3663075391))
            Line((117.7163733727, 60.3663075391), (118.2820587976, 60.9319925142))
        make_face(mode=Mode.SUBTRACT)
    extrude(amount=F1_DEPTH)


solid = f1.part
